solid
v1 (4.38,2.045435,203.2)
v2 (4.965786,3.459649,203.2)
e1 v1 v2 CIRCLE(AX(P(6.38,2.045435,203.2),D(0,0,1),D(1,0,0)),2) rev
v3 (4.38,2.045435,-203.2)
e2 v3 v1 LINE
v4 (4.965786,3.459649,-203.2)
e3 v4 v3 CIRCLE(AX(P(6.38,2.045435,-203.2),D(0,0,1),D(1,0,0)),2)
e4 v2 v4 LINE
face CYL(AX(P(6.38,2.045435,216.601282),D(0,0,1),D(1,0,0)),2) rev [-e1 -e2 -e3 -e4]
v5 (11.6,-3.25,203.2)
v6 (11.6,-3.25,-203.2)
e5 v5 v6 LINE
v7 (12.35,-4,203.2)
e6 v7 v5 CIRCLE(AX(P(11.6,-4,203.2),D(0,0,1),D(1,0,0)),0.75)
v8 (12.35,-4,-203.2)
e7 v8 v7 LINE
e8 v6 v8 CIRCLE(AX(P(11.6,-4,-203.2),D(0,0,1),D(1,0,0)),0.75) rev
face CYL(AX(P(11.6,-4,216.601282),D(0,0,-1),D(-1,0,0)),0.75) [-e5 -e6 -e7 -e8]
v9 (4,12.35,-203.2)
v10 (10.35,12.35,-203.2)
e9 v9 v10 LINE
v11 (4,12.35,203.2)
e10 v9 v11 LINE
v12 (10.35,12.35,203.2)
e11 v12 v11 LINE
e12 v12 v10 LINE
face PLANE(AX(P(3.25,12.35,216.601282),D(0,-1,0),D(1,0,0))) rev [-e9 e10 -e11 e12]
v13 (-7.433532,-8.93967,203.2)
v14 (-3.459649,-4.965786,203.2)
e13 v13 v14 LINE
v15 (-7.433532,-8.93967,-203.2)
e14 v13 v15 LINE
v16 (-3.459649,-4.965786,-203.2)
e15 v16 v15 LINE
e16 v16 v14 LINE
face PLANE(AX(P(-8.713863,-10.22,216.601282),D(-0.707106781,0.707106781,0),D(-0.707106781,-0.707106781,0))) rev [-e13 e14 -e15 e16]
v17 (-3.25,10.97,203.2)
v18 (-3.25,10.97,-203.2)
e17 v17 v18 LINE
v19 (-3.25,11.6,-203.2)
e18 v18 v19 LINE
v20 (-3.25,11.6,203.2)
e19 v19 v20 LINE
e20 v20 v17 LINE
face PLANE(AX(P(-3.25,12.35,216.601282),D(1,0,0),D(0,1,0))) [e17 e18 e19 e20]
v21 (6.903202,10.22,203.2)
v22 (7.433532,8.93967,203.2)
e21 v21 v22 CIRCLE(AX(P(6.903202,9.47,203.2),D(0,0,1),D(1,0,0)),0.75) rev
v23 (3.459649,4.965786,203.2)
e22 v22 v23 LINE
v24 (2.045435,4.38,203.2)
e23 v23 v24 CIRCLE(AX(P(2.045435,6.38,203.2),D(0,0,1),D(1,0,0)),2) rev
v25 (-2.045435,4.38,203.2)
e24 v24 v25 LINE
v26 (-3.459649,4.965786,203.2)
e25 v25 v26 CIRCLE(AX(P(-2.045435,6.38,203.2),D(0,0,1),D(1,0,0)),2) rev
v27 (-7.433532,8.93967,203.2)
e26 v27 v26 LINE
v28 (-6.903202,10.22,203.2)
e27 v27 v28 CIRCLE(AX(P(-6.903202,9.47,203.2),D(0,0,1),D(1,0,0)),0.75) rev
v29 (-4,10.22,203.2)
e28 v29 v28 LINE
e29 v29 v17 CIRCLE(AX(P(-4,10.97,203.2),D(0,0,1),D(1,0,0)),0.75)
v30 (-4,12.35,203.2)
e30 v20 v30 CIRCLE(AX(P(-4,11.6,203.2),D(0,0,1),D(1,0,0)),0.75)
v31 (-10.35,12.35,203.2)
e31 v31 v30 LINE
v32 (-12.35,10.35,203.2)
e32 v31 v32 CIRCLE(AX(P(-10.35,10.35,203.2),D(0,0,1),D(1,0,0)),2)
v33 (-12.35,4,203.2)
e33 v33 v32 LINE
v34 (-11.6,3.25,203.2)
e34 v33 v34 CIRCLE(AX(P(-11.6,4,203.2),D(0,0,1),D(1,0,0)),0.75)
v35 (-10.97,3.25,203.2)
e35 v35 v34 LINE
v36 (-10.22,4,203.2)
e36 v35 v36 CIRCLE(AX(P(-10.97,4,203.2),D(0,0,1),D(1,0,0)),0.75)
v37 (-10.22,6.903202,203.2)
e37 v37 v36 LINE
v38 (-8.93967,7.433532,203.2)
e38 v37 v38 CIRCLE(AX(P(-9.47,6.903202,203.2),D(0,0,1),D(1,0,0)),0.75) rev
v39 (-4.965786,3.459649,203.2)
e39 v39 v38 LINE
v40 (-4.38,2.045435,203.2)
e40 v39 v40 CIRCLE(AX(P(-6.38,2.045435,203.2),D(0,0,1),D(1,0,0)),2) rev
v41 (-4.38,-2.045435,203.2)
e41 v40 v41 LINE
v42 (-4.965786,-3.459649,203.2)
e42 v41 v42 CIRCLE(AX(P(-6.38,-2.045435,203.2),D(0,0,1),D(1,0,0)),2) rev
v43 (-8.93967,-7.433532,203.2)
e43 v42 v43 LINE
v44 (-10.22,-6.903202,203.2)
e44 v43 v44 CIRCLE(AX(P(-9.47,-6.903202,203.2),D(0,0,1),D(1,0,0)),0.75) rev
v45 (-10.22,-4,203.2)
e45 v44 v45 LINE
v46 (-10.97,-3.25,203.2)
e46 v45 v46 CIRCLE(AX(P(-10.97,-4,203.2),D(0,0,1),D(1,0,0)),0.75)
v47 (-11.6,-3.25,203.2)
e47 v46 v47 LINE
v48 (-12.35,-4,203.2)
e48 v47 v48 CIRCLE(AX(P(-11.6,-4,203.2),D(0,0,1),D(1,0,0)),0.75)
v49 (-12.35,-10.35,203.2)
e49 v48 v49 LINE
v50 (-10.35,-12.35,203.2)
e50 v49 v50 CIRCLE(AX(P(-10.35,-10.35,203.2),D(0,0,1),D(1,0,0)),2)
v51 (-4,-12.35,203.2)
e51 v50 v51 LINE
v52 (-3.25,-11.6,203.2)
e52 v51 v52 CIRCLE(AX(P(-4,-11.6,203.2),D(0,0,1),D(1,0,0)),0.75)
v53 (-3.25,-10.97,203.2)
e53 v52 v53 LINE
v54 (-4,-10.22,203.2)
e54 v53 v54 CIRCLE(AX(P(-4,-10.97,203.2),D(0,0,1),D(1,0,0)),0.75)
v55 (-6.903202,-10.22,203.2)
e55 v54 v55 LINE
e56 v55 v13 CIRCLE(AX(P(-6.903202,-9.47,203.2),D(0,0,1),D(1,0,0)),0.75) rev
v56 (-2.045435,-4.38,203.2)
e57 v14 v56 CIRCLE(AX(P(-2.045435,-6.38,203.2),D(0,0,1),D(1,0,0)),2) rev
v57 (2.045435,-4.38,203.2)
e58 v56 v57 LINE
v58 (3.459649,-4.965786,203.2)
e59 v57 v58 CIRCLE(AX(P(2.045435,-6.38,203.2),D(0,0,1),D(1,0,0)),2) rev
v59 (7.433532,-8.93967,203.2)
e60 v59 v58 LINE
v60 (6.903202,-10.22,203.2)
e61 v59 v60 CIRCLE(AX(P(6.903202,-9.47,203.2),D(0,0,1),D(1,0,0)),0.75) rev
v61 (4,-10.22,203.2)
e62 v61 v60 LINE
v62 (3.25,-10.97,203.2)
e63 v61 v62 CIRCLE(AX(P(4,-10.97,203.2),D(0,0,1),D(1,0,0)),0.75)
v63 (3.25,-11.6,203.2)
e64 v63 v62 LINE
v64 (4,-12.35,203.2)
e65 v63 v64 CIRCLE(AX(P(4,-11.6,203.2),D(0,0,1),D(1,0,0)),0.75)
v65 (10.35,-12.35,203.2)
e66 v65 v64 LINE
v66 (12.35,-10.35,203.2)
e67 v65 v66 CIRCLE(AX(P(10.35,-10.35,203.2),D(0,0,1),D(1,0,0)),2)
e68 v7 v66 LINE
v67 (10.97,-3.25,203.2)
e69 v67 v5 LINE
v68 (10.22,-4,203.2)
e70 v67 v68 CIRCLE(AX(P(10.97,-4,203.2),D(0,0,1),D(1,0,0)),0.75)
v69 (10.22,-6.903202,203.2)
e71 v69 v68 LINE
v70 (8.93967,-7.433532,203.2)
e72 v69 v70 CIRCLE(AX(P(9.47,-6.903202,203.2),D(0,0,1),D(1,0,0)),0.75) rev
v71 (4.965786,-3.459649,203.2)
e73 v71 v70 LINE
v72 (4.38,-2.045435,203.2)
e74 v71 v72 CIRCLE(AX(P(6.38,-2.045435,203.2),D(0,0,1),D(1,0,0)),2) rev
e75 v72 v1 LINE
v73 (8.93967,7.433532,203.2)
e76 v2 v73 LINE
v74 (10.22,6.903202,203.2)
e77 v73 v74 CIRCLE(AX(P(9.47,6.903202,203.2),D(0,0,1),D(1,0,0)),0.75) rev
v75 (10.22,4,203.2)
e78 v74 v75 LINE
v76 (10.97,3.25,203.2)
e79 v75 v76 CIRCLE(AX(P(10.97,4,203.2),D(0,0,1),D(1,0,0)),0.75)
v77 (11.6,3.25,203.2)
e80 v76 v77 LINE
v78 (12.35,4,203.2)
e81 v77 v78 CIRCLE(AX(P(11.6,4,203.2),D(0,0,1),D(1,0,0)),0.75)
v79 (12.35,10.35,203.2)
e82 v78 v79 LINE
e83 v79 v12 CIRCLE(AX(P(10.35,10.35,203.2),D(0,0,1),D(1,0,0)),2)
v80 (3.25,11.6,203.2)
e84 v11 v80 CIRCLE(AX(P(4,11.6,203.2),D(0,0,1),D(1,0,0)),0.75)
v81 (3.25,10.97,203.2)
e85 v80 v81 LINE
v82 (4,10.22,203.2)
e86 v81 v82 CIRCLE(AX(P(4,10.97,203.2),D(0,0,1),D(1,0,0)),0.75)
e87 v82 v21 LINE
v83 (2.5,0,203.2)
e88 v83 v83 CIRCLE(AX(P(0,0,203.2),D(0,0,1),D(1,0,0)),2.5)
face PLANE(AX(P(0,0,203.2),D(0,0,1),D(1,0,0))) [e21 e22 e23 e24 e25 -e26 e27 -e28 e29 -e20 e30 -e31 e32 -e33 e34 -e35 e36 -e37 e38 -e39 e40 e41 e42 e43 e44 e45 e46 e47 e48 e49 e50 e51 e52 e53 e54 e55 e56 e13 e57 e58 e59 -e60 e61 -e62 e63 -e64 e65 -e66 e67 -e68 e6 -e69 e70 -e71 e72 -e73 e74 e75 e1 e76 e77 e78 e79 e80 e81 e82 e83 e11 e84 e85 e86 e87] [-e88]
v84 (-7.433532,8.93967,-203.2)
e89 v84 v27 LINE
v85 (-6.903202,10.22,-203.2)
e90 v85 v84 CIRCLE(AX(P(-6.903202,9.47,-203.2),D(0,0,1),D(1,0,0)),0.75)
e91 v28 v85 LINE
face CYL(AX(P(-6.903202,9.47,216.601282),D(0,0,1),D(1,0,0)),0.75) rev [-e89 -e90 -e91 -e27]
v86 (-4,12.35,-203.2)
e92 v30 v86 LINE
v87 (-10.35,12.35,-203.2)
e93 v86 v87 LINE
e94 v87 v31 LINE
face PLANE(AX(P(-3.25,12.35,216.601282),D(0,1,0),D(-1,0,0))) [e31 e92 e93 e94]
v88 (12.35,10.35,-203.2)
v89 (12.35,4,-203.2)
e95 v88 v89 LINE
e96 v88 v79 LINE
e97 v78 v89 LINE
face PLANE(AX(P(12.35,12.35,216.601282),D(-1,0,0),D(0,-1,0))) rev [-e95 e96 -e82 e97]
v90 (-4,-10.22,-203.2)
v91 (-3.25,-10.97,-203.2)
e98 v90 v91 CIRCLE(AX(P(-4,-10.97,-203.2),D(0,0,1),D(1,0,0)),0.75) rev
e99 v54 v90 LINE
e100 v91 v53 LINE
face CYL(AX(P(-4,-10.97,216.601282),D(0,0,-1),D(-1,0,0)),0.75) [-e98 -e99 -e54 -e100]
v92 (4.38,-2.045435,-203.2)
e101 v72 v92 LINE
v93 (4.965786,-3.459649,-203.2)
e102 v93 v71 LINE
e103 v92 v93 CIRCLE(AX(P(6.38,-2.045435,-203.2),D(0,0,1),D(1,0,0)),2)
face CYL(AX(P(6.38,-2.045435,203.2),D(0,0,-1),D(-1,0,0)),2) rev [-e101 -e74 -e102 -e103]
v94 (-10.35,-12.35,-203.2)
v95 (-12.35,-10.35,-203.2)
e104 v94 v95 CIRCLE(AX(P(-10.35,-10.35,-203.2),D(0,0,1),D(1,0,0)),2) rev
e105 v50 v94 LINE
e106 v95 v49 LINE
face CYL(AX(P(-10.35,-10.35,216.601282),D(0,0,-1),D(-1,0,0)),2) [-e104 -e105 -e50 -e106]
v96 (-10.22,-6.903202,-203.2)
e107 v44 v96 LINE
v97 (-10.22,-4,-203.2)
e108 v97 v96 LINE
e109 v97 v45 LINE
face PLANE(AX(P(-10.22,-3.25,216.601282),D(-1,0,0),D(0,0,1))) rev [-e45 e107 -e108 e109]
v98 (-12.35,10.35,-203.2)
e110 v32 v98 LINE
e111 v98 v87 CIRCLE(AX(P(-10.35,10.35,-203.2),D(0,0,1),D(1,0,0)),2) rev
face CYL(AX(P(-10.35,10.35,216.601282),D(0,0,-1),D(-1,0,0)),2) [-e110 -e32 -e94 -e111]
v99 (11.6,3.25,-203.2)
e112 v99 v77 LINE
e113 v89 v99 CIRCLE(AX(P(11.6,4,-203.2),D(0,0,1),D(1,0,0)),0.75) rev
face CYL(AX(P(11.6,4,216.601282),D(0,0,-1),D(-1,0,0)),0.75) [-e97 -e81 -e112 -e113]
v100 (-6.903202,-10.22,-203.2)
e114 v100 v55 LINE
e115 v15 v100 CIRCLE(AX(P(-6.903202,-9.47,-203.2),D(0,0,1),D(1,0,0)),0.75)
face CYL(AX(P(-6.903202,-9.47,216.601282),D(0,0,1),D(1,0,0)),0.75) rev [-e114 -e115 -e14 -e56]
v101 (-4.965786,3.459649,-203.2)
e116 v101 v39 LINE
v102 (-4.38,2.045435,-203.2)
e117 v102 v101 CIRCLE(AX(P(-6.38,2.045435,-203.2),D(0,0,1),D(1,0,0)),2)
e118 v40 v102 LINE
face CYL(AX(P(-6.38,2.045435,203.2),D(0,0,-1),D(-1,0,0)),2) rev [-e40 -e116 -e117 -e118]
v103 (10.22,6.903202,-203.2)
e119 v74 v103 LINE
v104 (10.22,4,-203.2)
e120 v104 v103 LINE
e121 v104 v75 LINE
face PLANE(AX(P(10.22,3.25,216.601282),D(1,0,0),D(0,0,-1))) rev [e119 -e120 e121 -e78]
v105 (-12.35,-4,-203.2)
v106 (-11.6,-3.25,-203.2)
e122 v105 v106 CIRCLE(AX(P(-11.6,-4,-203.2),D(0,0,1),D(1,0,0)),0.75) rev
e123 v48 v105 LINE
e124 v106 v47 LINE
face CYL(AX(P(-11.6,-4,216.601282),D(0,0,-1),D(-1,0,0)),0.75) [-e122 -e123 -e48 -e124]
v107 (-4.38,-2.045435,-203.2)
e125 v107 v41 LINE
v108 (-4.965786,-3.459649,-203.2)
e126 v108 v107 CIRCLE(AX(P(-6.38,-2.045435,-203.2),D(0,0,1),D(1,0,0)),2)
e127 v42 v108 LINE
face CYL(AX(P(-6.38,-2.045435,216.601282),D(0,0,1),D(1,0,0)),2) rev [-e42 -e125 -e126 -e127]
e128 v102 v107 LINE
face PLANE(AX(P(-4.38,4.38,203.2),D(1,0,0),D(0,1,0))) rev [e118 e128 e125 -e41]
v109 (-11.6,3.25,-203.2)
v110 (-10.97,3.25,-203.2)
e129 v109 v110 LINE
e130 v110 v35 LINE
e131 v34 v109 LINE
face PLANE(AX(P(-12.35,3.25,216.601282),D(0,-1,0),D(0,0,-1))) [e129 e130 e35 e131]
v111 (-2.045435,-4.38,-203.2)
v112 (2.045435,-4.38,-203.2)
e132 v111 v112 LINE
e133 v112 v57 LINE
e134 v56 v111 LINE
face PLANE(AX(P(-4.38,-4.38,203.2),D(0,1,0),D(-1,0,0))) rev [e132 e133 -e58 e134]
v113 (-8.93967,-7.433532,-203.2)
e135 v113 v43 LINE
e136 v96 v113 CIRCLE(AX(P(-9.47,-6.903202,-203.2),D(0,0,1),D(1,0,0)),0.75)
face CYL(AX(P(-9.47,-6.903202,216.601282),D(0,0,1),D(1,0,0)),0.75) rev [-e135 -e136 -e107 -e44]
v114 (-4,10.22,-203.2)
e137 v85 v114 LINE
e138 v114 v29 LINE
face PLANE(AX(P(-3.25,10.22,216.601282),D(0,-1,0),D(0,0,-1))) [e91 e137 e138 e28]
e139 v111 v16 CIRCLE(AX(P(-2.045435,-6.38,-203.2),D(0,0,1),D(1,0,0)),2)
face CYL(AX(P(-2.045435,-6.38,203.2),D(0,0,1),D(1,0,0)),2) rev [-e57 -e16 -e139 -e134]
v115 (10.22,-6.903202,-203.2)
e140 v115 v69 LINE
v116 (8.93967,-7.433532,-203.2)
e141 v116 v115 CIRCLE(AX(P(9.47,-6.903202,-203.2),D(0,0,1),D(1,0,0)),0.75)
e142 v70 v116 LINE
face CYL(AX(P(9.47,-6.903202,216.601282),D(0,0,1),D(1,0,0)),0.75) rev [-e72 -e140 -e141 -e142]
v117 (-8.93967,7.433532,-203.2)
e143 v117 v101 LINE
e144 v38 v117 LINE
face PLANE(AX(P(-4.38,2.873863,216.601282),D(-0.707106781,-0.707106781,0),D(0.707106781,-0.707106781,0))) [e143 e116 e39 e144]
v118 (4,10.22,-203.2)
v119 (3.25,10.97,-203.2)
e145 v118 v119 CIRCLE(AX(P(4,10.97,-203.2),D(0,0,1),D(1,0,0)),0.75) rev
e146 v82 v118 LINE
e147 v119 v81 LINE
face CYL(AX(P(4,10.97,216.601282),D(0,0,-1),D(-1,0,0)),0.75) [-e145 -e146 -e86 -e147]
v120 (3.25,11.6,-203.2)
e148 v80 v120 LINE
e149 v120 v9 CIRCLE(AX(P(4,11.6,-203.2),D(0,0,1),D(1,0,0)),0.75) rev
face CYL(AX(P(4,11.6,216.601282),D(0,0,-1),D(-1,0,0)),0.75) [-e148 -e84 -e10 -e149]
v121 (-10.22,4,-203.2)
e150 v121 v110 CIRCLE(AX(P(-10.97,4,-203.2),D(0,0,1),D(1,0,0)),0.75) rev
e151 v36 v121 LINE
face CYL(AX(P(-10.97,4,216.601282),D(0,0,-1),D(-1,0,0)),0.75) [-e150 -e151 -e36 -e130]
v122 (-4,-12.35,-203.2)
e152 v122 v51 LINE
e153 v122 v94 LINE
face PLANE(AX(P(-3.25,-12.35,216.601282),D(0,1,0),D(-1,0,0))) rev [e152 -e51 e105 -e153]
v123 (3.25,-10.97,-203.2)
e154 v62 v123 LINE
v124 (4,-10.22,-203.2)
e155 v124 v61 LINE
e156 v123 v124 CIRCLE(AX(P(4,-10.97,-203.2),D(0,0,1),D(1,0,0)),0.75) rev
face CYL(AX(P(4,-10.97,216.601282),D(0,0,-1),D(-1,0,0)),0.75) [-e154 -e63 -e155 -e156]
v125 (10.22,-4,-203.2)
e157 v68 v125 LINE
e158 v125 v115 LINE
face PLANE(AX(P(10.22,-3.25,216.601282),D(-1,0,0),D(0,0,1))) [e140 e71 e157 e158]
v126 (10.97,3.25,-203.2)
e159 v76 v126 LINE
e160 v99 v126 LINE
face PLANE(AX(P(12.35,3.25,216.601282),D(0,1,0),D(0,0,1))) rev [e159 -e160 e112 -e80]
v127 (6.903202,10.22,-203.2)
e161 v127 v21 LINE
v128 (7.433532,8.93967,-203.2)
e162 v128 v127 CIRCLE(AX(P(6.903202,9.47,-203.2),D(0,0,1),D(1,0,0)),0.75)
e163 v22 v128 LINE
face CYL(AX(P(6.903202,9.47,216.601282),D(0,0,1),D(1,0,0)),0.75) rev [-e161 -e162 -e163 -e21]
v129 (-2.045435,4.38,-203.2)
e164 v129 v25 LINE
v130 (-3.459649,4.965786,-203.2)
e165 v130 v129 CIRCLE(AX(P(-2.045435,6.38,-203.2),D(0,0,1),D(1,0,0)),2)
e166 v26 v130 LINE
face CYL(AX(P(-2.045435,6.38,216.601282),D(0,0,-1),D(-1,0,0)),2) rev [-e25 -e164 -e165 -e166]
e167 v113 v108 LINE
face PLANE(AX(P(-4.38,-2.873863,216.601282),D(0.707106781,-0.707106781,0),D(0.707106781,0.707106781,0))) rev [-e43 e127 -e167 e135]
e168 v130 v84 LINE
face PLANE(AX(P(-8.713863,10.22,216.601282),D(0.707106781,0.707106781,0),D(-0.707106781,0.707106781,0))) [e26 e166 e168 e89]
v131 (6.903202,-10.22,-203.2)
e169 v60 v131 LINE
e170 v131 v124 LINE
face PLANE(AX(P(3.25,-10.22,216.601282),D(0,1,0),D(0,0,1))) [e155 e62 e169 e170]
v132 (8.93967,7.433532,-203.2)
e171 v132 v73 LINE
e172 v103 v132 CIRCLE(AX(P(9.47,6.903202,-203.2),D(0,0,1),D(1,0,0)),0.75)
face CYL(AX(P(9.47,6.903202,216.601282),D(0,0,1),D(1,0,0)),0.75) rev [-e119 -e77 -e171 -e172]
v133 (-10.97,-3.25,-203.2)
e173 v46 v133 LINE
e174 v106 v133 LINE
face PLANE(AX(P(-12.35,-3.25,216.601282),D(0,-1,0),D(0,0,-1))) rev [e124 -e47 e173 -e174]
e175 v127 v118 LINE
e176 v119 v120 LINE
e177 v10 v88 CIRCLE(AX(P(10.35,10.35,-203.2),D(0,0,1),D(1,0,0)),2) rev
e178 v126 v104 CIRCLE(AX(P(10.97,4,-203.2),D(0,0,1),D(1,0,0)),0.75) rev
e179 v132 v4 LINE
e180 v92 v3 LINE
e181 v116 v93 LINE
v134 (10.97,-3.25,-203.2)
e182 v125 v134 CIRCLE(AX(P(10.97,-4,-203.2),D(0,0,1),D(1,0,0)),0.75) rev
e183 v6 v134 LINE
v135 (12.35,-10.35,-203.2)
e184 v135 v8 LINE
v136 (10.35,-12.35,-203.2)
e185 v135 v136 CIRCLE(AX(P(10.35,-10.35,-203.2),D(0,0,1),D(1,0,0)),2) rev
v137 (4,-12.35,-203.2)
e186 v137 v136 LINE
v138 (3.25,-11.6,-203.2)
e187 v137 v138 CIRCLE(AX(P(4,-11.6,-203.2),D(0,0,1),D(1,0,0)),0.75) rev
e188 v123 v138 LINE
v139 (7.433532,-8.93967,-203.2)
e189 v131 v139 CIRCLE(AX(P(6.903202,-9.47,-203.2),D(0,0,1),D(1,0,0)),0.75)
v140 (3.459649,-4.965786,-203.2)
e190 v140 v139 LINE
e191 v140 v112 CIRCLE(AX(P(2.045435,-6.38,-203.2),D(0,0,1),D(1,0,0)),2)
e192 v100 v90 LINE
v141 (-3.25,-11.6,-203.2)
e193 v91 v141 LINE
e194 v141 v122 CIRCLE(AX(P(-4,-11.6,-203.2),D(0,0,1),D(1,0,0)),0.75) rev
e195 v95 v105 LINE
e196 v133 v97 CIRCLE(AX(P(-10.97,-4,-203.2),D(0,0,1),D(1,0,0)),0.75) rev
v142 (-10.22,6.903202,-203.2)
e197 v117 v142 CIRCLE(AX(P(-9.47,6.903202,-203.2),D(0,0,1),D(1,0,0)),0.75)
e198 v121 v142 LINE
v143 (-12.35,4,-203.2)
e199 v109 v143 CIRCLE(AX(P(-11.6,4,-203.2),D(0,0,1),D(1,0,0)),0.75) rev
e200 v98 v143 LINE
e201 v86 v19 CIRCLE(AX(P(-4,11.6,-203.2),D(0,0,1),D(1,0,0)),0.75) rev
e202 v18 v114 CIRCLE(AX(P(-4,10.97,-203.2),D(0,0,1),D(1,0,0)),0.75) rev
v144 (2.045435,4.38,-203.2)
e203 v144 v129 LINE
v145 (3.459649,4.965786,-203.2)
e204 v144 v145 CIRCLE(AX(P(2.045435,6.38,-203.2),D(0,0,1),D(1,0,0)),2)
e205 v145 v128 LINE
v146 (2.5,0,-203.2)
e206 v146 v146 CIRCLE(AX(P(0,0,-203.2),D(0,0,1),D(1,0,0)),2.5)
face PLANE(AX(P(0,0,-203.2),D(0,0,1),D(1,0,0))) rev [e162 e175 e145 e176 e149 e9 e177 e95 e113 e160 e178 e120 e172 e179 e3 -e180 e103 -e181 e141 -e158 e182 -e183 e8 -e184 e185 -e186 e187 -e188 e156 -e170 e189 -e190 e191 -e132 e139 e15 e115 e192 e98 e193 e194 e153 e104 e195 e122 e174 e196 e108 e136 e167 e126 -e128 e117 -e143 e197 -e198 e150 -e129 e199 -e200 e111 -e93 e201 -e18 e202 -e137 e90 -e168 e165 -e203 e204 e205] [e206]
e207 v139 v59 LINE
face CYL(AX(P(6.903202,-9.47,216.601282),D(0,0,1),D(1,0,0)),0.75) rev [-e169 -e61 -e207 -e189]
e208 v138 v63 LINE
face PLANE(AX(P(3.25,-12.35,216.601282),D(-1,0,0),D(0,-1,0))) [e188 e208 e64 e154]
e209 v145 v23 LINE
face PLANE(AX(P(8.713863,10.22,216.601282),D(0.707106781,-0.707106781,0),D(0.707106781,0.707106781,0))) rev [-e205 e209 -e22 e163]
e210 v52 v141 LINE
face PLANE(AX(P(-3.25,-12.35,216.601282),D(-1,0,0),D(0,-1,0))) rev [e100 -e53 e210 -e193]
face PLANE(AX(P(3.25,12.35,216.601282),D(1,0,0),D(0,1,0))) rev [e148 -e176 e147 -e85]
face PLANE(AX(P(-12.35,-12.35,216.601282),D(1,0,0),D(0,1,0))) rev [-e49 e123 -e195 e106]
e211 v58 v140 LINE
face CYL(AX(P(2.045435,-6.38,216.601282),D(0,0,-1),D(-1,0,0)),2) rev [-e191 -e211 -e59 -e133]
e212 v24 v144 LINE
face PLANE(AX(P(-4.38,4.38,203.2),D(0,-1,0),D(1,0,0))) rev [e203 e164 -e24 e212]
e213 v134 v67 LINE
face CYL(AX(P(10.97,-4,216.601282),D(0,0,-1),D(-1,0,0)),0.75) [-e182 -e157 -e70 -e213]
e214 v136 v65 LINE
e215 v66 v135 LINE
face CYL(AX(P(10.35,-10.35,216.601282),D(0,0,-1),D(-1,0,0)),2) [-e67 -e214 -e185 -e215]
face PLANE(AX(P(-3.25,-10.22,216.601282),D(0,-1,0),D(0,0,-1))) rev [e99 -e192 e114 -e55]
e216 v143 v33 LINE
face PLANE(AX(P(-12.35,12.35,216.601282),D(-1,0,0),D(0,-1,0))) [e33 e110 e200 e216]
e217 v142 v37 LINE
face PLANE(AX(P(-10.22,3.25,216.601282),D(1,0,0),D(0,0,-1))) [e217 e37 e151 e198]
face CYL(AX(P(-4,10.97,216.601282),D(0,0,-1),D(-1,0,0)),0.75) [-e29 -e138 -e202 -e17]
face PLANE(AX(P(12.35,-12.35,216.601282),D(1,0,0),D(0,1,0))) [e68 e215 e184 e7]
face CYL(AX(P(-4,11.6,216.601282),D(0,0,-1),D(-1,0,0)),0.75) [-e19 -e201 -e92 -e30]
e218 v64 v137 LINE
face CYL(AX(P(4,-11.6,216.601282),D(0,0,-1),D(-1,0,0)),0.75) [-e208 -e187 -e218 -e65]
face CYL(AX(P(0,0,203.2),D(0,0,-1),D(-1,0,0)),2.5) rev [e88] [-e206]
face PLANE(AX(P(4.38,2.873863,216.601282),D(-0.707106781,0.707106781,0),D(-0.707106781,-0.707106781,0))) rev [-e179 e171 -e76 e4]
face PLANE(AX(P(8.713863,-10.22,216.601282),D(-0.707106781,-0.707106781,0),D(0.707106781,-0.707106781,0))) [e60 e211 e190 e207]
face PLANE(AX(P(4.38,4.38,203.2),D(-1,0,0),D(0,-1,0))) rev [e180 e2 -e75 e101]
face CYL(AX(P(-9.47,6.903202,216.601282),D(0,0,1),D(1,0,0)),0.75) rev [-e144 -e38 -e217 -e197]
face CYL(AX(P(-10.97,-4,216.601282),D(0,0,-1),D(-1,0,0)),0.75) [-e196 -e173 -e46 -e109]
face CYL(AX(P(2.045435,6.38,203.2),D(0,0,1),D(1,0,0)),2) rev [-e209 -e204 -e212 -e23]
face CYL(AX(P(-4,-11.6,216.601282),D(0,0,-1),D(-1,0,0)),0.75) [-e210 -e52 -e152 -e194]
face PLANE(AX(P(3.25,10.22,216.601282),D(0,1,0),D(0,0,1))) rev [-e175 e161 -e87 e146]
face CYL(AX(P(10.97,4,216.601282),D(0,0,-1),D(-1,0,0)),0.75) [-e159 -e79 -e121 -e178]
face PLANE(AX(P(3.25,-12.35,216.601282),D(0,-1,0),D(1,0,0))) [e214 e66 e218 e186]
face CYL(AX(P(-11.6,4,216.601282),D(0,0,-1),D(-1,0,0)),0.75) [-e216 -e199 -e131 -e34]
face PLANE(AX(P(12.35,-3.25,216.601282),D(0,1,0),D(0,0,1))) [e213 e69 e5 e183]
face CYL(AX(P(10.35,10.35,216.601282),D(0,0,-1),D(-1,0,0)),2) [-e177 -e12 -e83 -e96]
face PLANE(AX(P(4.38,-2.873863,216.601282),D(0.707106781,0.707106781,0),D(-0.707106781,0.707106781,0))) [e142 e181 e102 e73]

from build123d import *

# Parameters (mm, degrees)
SKETCH2_W            = 8.76
SKETCH2_H            = 8.76
SKETCH2_R            = 2.5
BOSS_EXTRUDE1_DEPTH  = 203.2
BOSS_EXTRUDE2_START  = -203.2
BOSS_EXTRUDE2_DEPTH  = 406.4
FILLET1_R            = 0.75
FILLET1_OF_MIRROR1_R = 0.75
MIRROR2_START        = -203.2
MIRROR2_DEPTH        = 406.4
FILLET2_R            = 2


# Read off the part's stored shape, not the designer's step: Mirror2
with BuildPart() as part:
    # Sketch2 → Boss-Extrude1 (new, symmetric)
    with BuildSketch(Plane.XY):
        Rectangle(SKETCH2_W, SKETCH2_H)
        Circle(SKETCH2_R, mode=Mode.SUBTRACT)
    extrude(amount=BOSS_EXTRUDE1_DEPTH, both=True)

    # Sketch3 → Boss-Extrude2 (add)
    with BuildSketch(Plane.XY.offset(BOSS_EXTRUDE2_START)):
        Polygon((3.25, 12.35), (12.35, 12.35), (12.35, 3.25), (10.22, 3.25), (10.22, 8.713862556), (4.38, 2.873862556), (4.38, 4.38), (2.873862556, 4.38), (8.713862556, 10.22), (3.25, 10.22), align=None)
    boss_extrude2 = extrude(amount=BOSS_EXTRUDE2_DEPTH)

    # Fillet1
    fillet1_edges = [part.edges().sort_by_distance(p)[0] for p in [
        (3.25, 12.35, 0),
        (3.25, 10.22, 0),
        (8.713862556, 10.22, 0),
        (10.22, 8.713862556, 0),
        (10.22, 3.25, 0),
        (12.35, 3.25, 0),
    ]]
    fillet(fillet1_edges, radius=FILLET1_R)

    # Mirror1: Boss-Extrude2 across plane
    add(boss_extrude2.mirror(Plane.ZX))

    # Fillet1 of Mirror1
    fillet1_of_mirror1_edges = [part.edges().sort_by_distance(p)[0] for p in [
        (3.25, -12.35, 0),
        (3.25, -10.22, 0),
        (8.713862556, -10.22, 0),
        (10.22, -8.713862556, 0),
        (10.22, -3.25, 0),
        (12.35, -3.25, 0),
    ]]
    fillet(fillet1_of_mirror1_edges, radius=FILLET1_OF_MIRROR1_R)

    # Mirror2 outline → Mirror2 (add)
    with BuildSketch(Plane.XY.offset(MIRROR2_START)):
        with BuildLine():
            ThreePointArc((-7.43353247, 8.939669914), (-7.596112034, 9.757012574), (-6.903202384, 10.22))
            Line((-6.903202384, 10.22), (-4, 10.22))
            ThreePointArc((-4, 10.22), (-3.469669914, 10.439669914), (-3.25, 10.97))
            Line((-3.25, 10.97), (-3.25, 11.6))
            ThreePointArc((-3.25, 11.6), (-3.469669914, 12.130330086), (-4, 12.35))
            Line((-4, 12.35), (-12.35, 12.35))
            Line((-12.35, 12.35), (-12.35, 4))
            ThreePointArc((-12.35, 4), (-12.130330086, 3.469669914), (-11.6, 3.25))
            Line((-11.6, 3.25), (-10.97, 3.25))
            ThreePointArc((-10.97, 3.25), (-10.439669914, 3.469669914), (-10.22, 4))
            Line((-10.22, 4), (-10.22, 6.903202384))
            ThreePointArc((-10.22, 6.903202384), (-9.757012574, 7.596112034), (-8.939669914, 7.43353247))
            Line((-8.939669914, 7.43353247), (-4.38, 2.873862556))
            Line((-4.38, 2.873862556), (-4.38, 4.38))
            Line((-4.38, 4.38), (-2.873862556, 4.38))
            Line((-2.873862556, 4.38), (-7.43353247, 8.939669914))
        make_face()
        with BuildLine():
            Line((-4.38, -4.38), (-4.38, -2.873862556))
            Line((-4.38, -2.873862556), (-8.939669914, -7.43353247))
            ThreePointArc((-8.939669914, -7.43353247), (-9.757012574, -7.596112034), (-10.22, -6.903202384))
            Line((-10.22, -6.903202384), (-10.22, -4))
            ThreePointArc((-10.22, -4), (-10.439669914, -3.469669914), (-10.97, -3.25))
            Line((-10.97, -3.25), (-11.6, -3.25))
            ThreePointArc((-11.6, -3.25), (-12.130330086, -3.469669914), (-12.35, -4))
            Line((-12.35, -4), (-12.35, -12.35))
            Line((-12.35, -12.35), (-4, -12.35))
            ThreePointArc((-4, -12.35), (-3.469669914, -12.130330086), (-3.25, -11.6))
            Line((-3.25, -11.6), (-3.25, -10.97))
            ThreePointArc((-3.25, -10.97), (-3.469669914, -10.439669914), (-4, -10.22))
            Line((-4, -10.22), (-6.903202384, -10.22))
            ThreePointArc((-6.903202384, -10.22), (-7.596112034, -9.757012574), (-7.43353247, -8.939669914))
            Line((-7.43353247, -8.939669914), (-2.873862556, -4.38))
            Line((-2.873862556, -4.38), (-4.38, -4.38))
        make_face()
    extrude(amount=MIRROR2_DEPTH)

    # Fillet2
    fillet2_edges = [part.edges().sort_by_distance(p)[0] for p in [
        (-2.873862556, -4.38, 0),
        (-4.38, -2.873862556, 0),
        (-12.35, -12.35, 0),
        (2.873862556, 4.38, 0),
        (4.38, 2.873862556, 0),
        (12.35, 12.35, 0),
        (-2.873862556, 4.38, 0),
        (-4.38, 2.873862556, 0),
        (-12.35, 12.35, 0),
        (2.873862556, -4.38, 0),
        (4.38, -2.873862556, 0),
        (12.35, -12.35, 0),
    ]]
    fillet(fillet2_edges, radius=FILLET2_R)


solid = part.part
